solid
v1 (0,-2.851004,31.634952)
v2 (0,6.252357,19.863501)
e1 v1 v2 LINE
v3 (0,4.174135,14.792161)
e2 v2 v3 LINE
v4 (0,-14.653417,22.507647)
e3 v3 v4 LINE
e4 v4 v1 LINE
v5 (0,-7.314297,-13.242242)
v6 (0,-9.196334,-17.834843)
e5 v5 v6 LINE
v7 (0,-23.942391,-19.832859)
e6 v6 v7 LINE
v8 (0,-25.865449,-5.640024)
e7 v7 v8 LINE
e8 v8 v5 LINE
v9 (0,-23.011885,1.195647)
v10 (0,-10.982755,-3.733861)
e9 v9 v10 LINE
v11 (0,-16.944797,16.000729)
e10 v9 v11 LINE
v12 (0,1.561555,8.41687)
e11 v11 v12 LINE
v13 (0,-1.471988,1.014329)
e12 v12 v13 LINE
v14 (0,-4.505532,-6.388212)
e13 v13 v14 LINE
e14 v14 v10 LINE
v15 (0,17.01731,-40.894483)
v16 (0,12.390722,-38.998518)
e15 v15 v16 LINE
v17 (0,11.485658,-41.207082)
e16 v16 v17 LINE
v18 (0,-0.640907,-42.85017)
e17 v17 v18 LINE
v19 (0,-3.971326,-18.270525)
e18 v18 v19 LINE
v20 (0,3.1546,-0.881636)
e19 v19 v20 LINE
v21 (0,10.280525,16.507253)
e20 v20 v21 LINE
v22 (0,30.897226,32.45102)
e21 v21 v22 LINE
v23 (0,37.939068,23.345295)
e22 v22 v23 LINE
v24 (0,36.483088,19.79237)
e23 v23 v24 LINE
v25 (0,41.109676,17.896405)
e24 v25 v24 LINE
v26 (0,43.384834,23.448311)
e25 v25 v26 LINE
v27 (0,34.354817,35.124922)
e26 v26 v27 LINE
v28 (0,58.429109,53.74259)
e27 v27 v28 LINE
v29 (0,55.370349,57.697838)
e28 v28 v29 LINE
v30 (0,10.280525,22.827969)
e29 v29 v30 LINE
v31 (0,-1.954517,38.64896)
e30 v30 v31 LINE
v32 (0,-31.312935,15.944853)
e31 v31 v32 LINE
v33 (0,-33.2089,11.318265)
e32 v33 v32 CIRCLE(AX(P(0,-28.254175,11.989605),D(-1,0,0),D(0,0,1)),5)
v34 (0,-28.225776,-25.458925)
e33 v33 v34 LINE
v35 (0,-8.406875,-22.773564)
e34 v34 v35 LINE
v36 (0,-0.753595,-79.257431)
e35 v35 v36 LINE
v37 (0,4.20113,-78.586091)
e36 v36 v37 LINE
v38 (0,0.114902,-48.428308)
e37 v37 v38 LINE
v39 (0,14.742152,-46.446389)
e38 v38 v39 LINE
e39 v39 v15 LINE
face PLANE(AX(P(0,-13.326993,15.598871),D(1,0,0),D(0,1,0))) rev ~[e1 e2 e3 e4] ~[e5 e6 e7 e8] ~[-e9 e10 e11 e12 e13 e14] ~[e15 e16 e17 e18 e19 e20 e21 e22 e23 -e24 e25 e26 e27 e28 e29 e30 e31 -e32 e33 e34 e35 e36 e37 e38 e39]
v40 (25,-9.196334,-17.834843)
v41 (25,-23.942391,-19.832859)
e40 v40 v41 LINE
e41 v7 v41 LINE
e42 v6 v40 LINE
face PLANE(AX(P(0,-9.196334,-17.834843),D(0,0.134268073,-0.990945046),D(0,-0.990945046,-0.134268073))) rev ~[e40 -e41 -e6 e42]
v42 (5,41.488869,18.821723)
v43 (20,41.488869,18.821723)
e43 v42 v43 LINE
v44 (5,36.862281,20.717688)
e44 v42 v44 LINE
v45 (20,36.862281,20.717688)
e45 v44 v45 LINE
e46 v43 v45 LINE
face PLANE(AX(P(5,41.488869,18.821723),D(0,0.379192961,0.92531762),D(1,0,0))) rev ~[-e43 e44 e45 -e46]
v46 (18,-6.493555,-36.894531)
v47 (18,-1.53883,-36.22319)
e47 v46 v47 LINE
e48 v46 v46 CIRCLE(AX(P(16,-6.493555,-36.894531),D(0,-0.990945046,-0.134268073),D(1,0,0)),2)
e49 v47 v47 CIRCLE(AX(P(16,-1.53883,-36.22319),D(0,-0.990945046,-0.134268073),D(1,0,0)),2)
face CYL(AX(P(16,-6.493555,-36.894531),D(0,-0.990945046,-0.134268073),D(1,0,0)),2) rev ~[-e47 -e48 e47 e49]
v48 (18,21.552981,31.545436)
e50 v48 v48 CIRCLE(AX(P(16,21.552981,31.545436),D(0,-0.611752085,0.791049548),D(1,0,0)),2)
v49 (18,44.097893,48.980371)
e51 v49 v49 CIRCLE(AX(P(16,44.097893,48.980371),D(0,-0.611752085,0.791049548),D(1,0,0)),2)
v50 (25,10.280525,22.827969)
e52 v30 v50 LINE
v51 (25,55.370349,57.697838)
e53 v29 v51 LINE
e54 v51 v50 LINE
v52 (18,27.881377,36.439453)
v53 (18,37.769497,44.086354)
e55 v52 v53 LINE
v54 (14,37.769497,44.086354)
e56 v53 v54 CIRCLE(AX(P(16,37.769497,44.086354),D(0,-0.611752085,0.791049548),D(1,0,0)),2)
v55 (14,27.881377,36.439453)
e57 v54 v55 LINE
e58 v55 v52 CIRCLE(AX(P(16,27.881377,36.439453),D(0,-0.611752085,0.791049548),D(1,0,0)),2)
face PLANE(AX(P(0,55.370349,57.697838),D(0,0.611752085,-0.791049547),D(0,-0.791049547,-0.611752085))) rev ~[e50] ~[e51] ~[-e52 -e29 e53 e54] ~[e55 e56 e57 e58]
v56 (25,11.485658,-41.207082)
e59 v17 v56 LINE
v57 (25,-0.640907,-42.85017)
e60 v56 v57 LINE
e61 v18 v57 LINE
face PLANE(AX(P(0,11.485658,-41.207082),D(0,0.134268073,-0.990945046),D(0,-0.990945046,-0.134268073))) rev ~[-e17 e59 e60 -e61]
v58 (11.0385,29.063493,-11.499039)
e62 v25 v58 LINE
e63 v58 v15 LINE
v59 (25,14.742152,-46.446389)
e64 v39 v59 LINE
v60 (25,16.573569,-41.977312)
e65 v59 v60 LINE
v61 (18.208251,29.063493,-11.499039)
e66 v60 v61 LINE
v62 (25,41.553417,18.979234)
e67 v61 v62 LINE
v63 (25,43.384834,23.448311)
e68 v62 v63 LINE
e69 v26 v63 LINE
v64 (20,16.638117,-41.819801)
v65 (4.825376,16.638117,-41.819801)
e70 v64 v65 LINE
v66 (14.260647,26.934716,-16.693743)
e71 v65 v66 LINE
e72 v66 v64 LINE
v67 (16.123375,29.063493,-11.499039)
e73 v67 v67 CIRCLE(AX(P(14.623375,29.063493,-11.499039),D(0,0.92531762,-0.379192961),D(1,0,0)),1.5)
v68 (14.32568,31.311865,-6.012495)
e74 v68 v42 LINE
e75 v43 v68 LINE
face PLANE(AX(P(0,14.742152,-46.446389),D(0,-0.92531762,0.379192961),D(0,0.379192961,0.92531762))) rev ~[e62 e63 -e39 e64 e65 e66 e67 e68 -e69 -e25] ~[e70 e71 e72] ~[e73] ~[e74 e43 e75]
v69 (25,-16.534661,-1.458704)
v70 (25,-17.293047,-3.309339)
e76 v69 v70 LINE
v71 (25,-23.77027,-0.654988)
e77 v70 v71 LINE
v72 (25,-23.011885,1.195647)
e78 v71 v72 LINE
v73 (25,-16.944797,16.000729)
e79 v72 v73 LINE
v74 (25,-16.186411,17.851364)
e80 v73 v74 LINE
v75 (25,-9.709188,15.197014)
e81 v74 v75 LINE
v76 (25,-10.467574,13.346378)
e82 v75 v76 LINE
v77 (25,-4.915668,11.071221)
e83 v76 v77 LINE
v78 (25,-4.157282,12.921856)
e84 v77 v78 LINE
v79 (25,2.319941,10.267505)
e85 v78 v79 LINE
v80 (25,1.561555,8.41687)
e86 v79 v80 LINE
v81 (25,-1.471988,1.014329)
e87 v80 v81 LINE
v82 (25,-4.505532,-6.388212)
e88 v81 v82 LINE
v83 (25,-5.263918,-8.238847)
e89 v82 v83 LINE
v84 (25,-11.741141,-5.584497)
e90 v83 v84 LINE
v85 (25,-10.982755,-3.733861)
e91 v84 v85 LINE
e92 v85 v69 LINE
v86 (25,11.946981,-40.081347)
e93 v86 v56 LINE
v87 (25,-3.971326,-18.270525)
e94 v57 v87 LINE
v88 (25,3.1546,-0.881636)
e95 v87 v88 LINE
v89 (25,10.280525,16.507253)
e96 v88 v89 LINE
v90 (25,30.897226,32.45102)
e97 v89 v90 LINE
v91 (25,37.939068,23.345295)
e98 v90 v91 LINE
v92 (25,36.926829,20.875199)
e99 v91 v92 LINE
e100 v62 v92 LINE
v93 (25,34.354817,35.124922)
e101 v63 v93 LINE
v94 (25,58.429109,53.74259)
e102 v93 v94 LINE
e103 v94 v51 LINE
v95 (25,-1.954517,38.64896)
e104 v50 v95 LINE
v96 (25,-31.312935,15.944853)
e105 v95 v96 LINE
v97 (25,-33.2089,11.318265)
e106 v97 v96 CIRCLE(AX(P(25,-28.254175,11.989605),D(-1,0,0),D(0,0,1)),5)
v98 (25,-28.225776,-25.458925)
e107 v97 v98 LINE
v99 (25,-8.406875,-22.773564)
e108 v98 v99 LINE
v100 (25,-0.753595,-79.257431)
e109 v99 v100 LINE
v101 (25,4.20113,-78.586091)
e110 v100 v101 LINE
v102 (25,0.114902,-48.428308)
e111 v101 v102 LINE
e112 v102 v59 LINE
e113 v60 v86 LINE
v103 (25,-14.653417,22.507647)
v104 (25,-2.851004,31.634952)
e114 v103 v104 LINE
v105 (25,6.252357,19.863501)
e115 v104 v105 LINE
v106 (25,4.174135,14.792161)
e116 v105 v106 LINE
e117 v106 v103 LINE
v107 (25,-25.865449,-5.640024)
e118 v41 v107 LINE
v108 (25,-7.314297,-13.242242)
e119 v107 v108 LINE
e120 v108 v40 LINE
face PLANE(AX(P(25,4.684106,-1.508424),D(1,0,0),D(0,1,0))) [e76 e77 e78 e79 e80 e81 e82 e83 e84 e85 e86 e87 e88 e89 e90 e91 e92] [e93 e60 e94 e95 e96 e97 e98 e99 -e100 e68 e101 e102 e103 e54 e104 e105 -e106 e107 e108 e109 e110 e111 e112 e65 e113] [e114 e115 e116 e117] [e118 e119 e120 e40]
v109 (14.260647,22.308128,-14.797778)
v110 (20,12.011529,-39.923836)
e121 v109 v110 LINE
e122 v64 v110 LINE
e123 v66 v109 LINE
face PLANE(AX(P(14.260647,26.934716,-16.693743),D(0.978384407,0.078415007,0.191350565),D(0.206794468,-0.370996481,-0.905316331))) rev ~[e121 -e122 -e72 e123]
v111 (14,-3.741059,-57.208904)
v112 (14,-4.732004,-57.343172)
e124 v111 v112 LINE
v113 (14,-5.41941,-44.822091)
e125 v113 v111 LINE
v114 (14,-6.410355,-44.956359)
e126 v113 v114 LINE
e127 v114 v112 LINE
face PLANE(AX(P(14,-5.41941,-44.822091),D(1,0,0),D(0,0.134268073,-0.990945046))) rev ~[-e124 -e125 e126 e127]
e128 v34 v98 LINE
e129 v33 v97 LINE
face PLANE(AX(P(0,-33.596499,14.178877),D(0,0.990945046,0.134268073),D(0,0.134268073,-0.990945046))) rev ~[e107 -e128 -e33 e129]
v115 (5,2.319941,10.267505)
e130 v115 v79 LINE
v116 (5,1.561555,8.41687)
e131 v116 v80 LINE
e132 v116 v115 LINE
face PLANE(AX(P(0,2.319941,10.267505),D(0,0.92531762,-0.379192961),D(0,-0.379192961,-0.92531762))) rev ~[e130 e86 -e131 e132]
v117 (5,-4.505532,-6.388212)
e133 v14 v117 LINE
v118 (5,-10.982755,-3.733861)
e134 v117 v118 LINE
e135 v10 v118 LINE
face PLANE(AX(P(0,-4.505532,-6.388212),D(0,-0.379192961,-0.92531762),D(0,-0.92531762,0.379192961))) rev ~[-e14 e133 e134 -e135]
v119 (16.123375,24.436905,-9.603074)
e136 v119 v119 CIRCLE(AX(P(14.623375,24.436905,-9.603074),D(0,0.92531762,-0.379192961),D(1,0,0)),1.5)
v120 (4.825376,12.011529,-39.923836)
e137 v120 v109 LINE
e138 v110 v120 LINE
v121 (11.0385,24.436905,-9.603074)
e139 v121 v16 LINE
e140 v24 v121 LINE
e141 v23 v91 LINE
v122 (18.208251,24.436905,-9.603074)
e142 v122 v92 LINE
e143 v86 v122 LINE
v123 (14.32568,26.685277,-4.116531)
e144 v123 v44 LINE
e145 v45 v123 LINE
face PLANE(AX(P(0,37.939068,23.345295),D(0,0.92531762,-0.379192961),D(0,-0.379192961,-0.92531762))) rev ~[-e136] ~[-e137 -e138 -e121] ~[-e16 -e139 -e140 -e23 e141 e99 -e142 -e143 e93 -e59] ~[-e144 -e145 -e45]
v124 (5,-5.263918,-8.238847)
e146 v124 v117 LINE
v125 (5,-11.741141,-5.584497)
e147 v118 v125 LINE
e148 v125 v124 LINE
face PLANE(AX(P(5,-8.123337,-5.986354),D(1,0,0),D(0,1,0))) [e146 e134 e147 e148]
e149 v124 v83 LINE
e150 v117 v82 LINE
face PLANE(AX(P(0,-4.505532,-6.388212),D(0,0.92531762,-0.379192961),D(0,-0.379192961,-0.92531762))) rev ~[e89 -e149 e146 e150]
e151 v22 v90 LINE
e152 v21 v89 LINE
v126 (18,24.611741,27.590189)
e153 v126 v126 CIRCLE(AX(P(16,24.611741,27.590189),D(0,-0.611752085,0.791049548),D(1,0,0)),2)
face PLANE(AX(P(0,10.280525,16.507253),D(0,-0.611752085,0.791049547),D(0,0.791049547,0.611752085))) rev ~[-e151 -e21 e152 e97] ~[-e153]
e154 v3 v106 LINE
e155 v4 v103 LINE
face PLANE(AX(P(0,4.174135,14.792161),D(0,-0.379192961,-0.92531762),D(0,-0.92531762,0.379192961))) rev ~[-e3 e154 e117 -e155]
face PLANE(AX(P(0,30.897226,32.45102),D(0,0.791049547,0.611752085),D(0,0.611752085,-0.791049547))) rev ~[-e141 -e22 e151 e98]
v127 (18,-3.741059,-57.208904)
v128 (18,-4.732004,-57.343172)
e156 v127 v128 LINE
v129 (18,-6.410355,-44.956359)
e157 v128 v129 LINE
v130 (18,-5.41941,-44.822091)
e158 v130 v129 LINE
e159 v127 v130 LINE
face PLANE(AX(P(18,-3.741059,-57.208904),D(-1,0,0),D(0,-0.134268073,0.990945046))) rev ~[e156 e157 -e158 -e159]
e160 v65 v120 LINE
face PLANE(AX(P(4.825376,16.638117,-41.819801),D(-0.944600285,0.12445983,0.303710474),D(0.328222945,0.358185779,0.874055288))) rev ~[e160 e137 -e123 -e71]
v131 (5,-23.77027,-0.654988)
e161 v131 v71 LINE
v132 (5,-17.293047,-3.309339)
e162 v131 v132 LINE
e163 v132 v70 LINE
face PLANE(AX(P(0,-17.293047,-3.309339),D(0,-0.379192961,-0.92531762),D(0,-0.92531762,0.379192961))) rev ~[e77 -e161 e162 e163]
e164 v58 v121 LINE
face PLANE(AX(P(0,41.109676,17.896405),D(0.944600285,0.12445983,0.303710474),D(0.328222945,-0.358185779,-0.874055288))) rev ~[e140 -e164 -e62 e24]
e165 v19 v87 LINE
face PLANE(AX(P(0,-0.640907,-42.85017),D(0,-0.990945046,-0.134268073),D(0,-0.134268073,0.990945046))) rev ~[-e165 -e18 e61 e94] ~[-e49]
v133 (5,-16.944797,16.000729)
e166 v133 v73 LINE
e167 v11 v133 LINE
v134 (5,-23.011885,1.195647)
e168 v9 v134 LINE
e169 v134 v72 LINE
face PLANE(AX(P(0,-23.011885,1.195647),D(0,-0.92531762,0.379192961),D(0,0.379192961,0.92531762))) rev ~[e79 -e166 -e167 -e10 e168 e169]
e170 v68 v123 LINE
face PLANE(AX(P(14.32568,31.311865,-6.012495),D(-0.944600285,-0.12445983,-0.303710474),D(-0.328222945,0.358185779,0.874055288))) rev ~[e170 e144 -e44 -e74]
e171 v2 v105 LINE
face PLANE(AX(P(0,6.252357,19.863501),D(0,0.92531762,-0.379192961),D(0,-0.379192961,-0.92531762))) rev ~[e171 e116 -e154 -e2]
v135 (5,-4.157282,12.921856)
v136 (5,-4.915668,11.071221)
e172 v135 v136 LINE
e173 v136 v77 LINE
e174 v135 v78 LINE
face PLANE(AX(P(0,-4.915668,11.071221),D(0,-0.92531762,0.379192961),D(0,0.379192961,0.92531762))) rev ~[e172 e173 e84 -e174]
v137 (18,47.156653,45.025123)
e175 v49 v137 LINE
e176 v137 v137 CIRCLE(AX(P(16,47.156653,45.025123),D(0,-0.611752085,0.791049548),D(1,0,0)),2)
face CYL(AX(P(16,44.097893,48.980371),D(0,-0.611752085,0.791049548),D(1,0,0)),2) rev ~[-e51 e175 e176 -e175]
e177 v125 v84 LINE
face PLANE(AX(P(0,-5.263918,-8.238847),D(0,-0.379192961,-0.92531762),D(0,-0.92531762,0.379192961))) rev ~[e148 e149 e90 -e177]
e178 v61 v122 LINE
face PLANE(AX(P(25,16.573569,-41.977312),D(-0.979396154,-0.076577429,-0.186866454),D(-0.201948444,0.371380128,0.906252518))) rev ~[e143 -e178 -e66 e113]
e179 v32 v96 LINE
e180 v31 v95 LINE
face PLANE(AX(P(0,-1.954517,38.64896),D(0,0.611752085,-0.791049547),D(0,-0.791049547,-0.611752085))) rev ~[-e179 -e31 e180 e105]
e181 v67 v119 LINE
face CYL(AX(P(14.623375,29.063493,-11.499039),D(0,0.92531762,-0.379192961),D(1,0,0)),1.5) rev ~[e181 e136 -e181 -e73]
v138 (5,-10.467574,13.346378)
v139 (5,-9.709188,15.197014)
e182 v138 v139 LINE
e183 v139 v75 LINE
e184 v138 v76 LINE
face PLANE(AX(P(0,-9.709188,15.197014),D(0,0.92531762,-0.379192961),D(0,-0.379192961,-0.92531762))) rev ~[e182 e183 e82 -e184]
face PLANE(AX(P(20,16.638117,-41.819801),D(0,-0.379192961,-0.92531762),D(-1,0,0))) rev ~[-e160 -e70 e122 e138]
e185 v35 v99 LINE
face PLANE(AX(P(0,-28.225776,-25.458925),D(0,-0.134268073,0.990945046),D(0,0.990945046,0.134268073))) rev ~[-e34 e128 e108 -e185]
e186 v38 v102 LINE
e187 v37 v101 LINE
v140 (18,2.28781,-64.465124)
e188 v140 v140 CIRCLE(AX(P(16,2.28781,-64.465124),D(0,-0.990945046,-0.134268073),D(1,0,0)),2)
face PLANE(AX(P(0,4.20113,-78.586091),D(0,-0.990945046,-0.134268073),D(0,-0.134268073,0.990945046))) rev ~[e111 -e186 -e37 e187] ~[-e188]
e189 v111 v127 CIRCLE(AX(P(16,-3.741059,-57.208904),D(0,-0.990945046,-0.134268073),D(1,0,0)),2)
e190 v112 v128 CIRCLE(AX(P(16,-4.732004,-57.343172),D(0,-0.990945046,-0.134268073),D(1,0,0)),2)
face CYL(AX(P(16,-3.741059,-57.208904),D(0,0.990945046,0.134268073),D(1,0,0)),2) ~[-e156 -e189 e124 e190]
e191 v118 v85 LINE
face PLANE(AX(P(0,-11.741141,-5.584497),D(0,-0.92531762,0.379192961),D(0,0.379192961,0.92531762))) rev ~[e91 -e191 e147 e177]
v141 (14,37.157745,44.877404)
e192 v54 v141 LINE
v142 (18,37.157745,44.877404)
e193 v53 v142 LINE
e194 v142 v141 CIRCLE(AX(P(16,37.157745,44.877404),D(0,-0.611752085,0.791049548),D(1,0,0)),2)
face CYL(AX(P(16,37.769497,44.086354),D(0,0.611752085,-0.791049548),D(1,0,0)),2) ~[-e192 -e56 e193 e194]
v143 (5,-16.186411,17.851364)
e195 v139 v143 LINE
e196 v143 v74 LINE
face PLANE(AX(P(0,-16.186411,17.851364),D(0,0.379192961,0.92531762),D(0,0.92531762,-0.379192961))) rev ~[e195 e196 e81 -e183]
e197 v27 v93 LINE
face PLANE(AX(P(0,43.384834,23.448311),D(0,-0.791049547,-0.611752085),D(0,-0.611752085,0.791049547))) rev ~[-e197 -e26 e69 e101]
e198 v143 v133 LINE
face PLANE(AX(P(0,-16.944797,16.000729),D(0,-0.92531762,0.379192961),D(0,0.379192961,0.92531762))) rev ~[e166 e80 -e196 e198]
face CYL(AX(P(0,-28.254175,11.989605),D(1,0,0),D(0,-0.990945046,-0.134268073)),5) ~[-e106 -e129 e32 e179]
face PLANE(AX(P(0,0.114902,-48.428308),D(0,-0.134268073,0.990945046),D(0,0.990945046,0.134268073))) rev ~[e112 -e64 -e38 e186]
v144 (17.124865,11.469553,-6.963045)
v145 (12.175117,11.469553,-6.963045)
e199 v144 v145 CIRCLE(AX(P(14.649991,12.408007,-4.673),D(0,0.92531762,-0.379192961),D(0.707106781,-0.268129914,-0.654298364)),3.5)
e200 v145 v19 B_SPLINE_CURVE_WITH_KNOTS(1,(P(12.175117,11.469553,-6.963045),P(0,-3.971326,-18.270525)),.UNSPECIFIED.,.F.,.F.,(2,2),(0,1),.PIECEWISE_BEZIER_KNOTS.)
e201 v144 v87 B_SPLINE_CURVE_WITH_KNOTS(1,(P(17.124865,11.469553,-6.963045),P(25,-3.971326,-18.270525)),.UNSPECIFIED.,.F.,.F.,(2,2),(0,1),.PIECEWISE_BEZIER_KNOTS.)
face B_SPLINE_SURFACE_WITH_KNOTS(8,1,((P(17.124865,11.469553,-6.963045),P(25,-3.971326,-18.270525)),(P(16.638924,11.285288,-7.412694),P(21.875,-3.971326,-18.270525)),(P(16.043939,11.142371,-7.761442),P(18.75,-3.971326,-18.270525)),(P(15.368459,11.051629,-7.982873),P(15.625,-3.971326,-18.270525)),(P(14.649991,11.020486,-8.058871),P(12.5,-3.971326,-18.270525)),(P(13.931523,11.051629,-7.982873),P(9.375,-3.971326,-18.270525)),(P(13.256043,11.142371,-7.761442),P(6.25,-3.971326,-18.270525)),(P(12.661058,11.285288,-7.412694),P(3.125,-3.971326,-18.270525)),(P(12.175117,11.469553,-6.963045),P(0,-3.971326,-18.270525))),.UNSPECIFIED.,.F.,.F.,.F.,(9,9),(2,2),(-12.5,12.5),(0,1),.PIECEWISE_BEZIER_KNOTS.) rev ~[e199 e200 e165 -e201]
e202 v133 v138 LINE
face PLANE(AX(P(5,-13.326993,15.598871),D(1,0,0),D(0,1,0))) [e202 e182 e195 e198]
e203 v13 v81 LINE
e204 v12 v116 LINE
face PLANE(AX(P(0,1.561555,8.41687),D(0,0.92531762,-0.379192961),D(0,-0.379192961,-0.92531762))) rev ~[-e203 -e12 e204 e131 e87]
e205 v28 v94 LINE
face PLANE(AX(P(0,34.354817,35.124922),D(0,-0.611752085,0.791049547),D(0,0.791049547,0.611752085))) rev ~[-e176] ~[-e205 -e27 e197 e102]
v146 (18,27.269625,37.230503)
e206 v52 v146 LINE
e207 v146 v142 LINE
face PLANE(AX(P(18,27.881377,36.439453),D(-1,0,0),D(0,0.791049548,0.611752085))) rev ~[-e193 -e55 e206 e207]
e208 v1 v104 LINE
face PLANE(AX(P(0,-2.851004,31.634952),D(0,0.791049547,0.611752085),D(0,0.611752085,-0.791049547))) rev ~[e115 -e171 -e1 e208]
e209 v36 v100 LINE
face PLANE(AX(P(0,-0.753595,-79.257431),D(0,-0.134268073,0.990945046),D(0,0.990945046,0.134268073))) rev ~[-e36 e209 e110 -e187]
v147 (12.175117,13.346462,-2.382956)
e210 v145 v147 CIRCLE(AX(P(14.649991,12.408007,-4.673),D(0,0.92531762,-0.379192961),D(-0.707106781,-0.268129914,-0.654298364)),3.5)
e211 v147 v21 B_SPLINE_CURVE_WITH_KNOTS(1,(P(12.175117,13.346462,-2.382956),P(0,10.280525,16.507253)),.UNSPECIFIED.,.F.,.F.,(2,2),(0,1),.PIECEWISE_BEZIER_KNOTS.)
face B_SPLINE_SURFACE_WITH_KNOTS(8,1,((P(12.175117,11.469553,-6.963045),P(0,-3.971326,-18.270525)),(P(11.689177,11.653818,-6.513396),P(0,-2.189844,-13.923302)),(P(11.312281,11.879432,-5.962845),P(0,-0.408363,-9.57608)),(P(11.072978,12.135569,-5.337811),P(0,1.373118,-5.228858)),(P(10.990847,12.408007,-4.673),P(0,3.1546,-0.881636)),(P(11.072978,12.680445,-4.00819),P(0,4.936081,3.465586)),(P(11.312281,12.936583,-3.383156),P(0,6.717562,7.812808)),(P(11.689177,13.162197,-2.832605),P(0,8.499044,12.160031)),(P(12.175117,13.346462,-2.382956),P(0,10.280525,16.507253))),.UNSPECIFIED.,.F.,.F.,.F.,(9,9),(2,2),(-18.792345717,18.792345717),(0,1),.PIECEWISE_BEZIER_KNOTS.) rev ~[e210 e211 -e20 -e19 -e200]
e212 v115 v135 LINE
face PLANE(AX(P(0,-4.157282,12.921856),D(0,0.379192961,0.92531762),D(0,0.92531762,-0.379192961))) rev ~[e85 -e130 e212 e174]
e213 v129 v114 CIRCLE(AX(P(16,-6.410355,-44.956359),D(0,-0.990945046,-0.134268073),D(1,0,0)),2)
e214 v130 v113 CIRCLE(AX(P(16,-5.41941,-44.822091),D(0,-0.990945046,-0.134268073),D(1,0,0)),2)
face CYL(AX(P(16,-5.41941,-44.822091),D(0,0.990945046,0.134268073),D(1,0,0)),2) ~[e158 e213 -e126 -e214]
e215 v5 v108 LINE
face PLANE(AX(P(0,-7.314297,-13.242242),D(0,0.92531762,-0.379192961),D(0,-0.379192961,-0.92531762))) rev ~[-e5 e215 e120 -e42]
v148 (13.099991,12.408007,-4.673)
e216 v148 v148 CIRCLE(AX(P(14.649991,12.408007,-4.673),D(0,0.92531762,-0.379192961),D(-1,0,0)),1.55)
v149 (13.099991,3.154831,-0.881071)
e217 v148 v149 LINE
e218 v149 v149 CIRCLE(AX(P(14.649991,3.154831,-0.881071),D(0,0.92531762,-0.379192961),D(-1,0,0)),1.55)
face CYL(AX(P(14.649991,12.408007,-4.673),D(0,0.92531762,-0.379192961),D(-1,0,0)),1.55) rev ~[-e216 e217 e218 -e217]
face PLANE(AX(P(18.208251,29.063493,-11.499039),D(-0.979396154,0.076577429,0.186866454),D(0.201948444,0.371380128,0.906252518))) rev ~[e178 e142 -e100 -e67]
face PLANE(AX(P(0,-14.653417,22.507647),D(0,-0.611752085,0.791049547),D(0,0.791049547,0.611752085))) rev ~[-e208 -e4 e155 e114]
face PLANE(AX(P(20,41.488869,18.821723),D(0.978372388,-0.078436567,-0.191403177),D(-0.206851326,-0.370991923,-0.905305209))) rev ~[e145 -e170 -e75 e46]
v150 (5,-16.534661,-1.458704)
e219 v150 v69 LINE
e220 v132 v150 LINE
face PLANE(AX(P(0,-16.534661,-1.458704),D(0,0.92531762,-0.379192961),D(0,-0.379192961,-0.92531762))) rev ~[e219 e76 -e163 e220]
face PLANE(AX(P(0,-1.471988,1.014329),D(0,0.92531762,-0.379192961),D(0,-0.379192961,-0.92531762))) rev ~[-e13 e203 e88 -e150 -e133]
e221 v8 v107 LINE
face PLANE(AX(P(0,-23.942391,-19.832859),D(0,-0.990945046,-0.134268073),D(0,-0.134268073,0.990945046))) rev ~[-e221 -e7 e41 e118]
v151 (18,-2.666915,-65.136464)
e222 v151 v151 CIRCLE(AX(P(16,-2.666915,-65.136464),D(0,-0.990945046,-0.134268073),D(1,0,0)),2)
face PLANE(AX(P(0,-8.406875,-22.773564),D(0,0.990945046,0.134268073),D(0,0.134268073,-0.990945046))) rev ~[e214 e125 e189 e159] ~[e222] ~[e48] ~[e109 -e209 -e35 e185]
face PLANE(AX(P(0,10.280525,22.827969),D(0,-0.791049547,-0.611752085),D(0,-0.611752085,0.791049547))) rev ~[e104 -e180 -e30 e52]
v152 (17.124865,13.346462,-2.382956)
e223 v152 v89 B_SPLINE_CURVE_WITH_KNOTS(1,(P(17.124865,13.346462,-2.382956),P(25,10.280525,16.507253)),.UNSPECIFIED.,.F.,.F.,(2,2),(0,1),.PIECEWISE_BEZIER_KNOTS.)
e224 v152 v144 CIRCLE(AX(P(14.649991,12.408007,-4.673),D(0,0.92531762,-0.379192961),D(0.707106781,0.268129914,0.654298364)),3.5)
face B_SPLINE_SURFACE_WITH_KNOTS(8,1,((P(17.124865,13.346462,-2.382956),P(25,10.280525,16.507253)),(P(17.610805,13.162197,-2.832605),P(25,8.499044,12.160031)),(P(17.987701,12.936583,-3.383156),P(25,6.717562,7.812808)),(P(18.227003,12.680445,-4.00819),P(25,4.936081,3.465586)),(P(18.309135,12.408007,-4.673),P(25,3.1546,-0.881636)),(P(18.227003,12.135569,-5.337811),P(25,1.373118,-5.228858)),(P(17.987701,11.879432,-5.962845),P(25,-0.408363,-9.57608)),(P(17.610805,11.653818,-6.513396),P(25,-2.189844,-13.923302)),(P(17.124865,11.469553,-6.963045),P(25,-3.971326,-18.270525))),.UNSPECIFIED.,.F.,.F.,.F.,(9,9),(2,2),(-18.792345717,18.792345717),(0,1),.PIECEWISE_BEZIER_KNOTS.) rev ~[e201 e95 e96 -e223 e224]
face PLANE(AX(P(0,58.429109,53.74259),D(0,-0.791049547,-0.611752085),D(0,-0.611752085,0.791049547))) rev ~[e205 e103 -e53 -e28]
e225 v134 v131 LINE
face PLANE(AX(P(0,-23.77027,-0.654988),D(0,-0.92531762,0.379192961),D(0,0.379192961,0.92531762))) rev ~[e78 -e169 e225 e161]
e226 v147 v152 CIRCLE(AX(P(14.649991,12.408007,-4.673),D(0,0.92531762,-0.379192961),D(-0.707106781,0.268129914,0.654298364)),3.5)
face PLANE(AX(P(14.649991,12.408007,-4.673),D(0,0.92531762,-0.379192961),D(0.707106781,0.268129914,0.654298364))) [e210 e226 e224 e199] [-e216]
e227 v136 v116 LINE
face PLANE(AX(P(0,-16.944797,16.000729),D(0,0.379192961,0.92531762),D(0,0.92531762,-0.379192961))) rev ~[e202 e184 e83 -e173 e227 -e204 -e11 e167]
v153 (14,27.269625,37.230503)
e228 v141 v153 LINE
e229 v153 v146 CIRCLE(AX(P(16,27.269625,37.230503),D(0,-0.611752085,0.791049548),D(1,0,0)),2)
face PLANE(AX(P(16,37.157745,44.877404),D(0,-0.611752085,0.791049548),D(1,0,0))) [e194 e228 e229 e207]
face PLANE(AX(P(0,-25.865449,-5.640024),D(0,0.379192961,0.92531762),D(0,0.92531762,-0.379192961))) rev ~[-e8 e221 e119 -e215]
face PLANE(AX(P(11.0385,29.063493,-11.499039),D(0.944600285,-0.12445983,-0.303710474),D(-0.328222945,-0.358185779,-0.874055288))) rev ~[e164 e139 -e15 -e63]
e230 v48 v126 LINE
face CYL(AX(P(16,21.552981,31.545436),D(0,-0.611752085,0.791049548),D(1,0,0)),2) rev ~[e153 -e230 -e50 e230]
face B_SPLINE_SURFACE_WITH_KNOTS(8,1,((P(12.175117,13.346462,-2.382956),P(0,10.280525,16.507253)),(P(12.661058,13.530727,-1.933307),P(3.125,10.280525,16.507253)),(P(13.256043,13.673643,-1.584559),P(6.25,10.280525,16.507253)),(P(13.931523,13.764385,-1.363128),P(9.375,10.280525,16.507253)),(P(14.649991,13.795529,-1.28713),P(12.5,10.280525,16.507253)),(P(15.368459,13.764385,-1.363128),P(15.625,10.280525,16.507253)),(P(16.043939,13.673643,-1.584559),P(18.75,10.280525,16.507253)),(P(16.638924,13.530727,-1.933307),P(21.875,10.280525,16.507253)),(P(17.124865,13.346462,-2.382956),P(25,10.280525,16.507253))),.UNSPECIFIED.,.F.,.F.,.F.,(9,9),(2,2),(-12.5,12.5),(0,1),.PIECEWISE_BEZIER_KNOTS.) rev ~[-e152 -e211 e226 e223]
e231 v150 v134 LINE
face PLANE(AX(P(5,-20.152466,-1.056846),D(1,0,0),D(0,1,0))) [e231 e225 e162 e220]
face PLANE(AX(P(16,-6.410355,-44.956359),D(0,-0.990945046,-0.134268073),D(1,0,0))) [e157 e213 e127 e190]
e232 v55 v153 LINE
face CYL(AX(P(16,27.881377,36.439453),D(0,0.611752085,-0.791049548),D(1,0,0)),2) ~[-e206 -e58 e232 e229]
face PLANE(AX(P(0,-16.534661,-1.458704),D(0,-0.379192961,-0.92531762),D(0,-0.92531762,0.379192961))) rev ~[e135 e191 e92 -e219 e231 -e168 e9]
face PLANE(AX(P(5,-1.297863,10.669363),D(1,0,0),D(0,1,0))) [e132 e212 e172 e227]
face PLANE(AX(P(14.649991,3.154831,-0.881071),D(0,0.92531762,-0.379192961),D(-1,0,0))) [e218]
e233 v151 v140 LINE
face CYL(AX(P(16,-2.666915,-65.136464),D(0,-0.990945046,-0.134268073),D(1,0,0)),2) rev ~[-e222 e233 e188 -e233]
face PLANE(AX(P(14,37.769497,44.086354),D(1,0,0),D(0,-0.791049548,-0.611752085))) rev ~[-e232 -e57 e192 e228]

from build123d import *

# Parameters (mm, degrees)
F1_DEPTH  = 25
F2_DEPTH  = 5
F3_R      = 5
F5_DEPTH  = 5
F6_W      = 25
F6_H      = 37.5846914337
F10_R     = 1.55
F11_DEPTH = 10
F14_DEPTH = 1
F15_DEPTH = 1
F16_DEPTH = 5
F17_DEPTH = 5


# Not quite as in the source:
# - a feature names something its author has since deleted; it is built from what else it names


with BuildPart() as f1:
    # F0 (on Right) → F1 (new body)
    with BuildSketch(Plane.YZ):
        Polygon((-1.9545168432, 38.6489601963), (-33.5964987424, 14.1788767986), (-28.2257758369, -25.4589250511), (-8.406874912, -22.7735635983), (-0.7535947717, -79.2574312341), (4.2011304595, -78.5860908709), (0.1149024355, -48.4283077234), (-0.6409071668, -42.8501701471), (-3.9713255886, -18.2705245759), (3.1545996335, -0.8816359607), (10.2805248557, 16.5072526545), (30.8972257421, 32.4510197574), (34.3548171712, 35.1249215027), (58.4291094867, 53.742590351), (55.370349062, 57.6978380884), (10.2805248557, 22.8279692467), align=None)
        Polygon((-25.8654488138, -5.6400241263), (-7.3142972833, -13.2422419285), (-9.1963342424, -17.8348428934), (-23.9423909688, -19.8328594567), align=None, mode=Mode.SUBTRACT)
        Polygon((1.5615552233, 8.4168698067), (-1.4719884671, 1.0143288458), (-4.5055321574, -6.3882121151), (-5.26391808, -8.2388473554), (-11.7411414209, -5.5844966263), (-17.2930471416, -3.3093388585), (-23.7702704824, -0.6549881294), (-23.0118845598, 1.1956471108), (-16.944797179, 16.0007290327), (-16.1864112564, 17.851364273), (-9.7091879156, 15.1970135439), (-4.1572821949, 12.9218557761), (2.3199411459, 10.267505047), align=None, mode=Mode.SUBTRACT)
        Polygon((-14.6534166938, 22.50764705), (-2.8510041559, 31.6349520341), (6.2523573083, 19.863500585), (4.1741345282, 14.7921613112), align=None, mode=Mode.SUBTRACT)
        Polygon((-10.4675738382, 13.3463783036), (-4.9156681175, 11.0712205358), (-4.1572821949, 12.9218557761), (-9.7091879156, 15.1970135439), align=None)
        Polygon((-11.7411414209, -5.5844966263), (-10.9827554983, -3.7338613861), (-16.534661219, -1.4587036183), (-17.2930471416, -3.3093388585), align=None)
        Polygon((43.3848339814, 23.4483111776), (34.3548171712, 35.1249215027), (30.8972257421, 32.4510197574), (37.9390681356, 23.3452947817), (11.4856577492, -41.2070815569), (-0.6409071668, -42.8501701471), (0.1149024355, -48.4283077234), (14.7421520123, -46.4463889317), align=None)
    extrude(amount=F1_DEPTH)

    # F0 (on Right) → F2 (join)
    with BuildSketch(Plane.YZ):
        Polygon((-16.944797179, 16.0007290327), (-10.4675738382, 13.3463783036), (-9.7091879156, 15.1970135439), (-16.1864112564, 17.851364273), align=None)
        Polygon((-4.9156681175, 11.0712205358), (1.5615552233, 8.4168698067), (2.3199411459, 10.267505047), (-4.1572821949, 12.9218557761), align=None)
        Polygon((-17.2930471416, -3.3093388585), (-16.534661219, -1.4587036183), (-23.0118845598, 1.1956471108), (-23.7702704824, -0.6549881294), align=None)
        Polygon((-5.26391808, -8.2388473554), (-4.5055321574, -6.3882121151), (-10.9827554983, -3.7338613861), (-11.7411414209, -5.5844966263), align=None)
    extrude(amount=F2_DEPTH)

    # F3
    f3_edges = [f1.edges().sort_by_distance(p)[0] for p in [
        (12.5, -33.596499, 14.178877),
    ]]
    fillet(f3_edges, radius=F3_R)

    # F4 (on face) → F5 (cut)
    with BuildSketch(Plane(origin=(0, 28.9192447, -11.8510377387), x_dir=(-1, 0, 0), z_dir=(0, 0.9253176201, -0.3791929613))):
        Polygon((-25, 33.3185826418), (-25, -32.5577652662), (-18.2082508509, 0.3804086878), align=None)
        Polygon((-14.2606471901, -5.2335595779), (-20, -32.3875417919), (-4.8253758508, -32.3875417919), align=None)
        Polygon((-11.0385, 0.3804086878), (0, -31.3875417919), (0, 32.1483591675), align=None)
        with BuildLine():
            ThreePointArc((-13.1233754255, 0.3804086878), (-14.6233754255, 1.8804086878), (-16.1233754255, 0.3804086878))
            Line((-16.1233754255, 0.3804086878), (-13.1233754255, 0.3804086878))
        make_face()
        with BuildLine():
            Line((-13.1233754255, 0.3804086878), (-16.1233754255, 0.3804086878))
            ThreePointArc((-16.1233754255, 0.3804086878), (-14.6233754255, -1.1195913122), (-13.1233754255, 0.3804086878))
        make_face()
        Polygon((-5, 33.1483591675), (-20, 33.1483591675), (-14.3256804669, 6.3097710203), align=None)
    extrude(amount=-F5_DEPTH, mode=Mode.SUBTRACT)

    # F8 (on offset) → F9 section 0
    with BuildSketch(Plane(origin=(0, 12.2635275379, -5.0255644353), x_dir=(-1, 0, 0), z_dir=(0, 0.9253176201, -0.3791929613))):
        with BuildLine():
            ThreePointArc((-17.1248646707, 2.8558931882), (-18.1499909365, 0.381019454), (-17.1248646707, -2.0938542801))
            ThreePointArc((-17.1248646707, -2.0938542801), (-14.6499909365, -3.118980546), (-12.1751172024, -2.0938542801))
            ThreePointArc((-12.1751172024, -2.0938542801), (-11.1499909365, 0.381019454), (-12.1751172024, 2.8558931882))
            ThreePointArc((-12.1751172024, 2.8558931882), (-14.6499909365, 3.881019454), (-17.1248646707, 2.8558931882))
        make_face()
    # F6 (on face) → F9 section 1
    with BuildSketch(Plane(origin=(0, 3.0103513367, -1.2336348224), x_dir=(-1, 0, 0), z_dir=(0, 0.9253176201, -0.3791929613))):
        with Locations((-12.5, 0.3804086878)):
            Rectangle(F6_W, F6_H)
    loft()

    # F10 (on face) → F11 (cut)
    with BuildSketch(Plane(origin=(0, 12.2635275379, -5.0255644353), x_dir=(-1, 0, 0), z_dir=(0, 0.9253176201, -0.3791929613))):
        with Locations((-14.6499909461, 0.3810196067)):
            Circle(F10_R)
    extrude(amount=-F11_DEPTH, mode=Mode.SUBTRACT)

    # F13 (on face) → F14 (join)
    with BuildSketch(Plane(origin=(0, -11.2853910764, -1.5291137632), x_dir=(1, 0, 0), z_dir=(0, -0.9909450462, -0.1342680726))):
        with BuildLine():
            ThreePointArc((14, -43.6885751417), (16, -45.6885751417), (18, -43.6885751417))
            ThreePointArc((18, -43.6885751417), (16, -41.6885751417), (14, -43.6885751417))
        make_face()
        with BuildLine():
            Line((18, -56.1885751417), (18, -43.6885751417))
            ThreePointArc((18, -43.6885751417), (16, -45.6885751417), (14, -43.6885751417))
            Line((14, -43.6885751417), (14, -56.1885751417))
            ThreePointArc((14, -56.1885751417), (16, -54.1885751417), (18, -56.1885751417))
        make_face()
        with BuildLine():
            ThreePointArc((14, -56.1885751417), (16, -58.1885751417), (18, -56.1885751417))
            ThreePointArc((18, -56.1885751417), (16, -54.1885751417), (14, -56.1885751417))
        make_face()
    extrude(amount=F14_DEPTH)

    # F12 (on face) → F15 (join)
    with BuildSketch(Plane(origin=(0, -7.1996627103, 9.3098006026), x_dir=(1, 0, 0), z_dir=(0, -0.6117520849, 0.7910495475))):
        with BuildLine():
            ThreePointArc((14, 56.8474623166), (16, 54.8474623166), (18, 56.8474623166))
            ThreePointArc((18, 56.8474623166), (16, 58.8474623166), (14, 56.8474623166))
        make_face()
        with BuildLine():
            Line((18, 44.3474623166), (18, 56.8474623166))
            ThreePointArc((18, 56.8474623166), (16, 54.8474623166), (14, 56.8474623166))
            Line((14, 56.8474623166), (14, 44.3474623166))
            ThreePointArc((14, 44.3474623166), (16, 46.3474623166), (18, 44.3474623166))
        make_face()
        with BuildLine():
            ThreePointArc((14, 44.3474623166), (16, 42.3474623166), (18, 44.3474623166))
            ThreePointArc((18, 44.3474623166), (16, 46.3474623166), (14, 44.3474623166))
        make_face()
    extrude(amount=F15_DEPTH)

    # F12 (on face) → F16 (cut)
    with BuildSketch(Plane(origin=(0, -7.1996627103, 9.3098006026), x_dir=(1, 0, 0), z_dir=(0, -0.6117520849, 0.7910495475))):
        with BuildLine():
            ThreePointArc((14, 64.8474623166), (16, 62.8474623166), (18, 64.8474623166))
            ThreePointArc((18, 64.8474623166), (16, 66.8474623166), (14, 64.8474623166))
        make_face()
        with BuildLine():
            ThreePointArc((14, 36.3474623166), (16, 34.3474623166), (18, 36.3474623166))
            ThreePointArc((18, 36.3474623166), (16, 38.3474623166), (14, 36.3474623166))
        make_face()
    extrude(amount=-F16_DEPTH, mode=Mode.SUBTRACT)

    # F13 (on face) → F17 (cut)
    with BuildSketch(Plane(origin=(0, -11.2853910764, -1.5291137632), x_dir=(1, 0, 0), z_dir=(0, -0.9909450462, -0.1342680726))):
        with BuildLine():
            ThreePointArc((14, -35.6885751417), (16, -37.6885751417), (18, -35.6885751417))
            ThreePointArc((18, -35.6885751417), (16, -33.6885751417), (14, -35.6885751417))
        make_face()
        with BuildLine():
            ThreePointArc((14, -64.1885751417), (16, -66.1885751417), (18, -64.1885751417))
            ThreePointArc((18, -64.1885751417), (16, -62.1885751417), (14, -64.1885751417))
        make_face()
    extrude(amount=-F17_DEPTH, mode=Mode.SUBTRACT)


solid = f1.part
